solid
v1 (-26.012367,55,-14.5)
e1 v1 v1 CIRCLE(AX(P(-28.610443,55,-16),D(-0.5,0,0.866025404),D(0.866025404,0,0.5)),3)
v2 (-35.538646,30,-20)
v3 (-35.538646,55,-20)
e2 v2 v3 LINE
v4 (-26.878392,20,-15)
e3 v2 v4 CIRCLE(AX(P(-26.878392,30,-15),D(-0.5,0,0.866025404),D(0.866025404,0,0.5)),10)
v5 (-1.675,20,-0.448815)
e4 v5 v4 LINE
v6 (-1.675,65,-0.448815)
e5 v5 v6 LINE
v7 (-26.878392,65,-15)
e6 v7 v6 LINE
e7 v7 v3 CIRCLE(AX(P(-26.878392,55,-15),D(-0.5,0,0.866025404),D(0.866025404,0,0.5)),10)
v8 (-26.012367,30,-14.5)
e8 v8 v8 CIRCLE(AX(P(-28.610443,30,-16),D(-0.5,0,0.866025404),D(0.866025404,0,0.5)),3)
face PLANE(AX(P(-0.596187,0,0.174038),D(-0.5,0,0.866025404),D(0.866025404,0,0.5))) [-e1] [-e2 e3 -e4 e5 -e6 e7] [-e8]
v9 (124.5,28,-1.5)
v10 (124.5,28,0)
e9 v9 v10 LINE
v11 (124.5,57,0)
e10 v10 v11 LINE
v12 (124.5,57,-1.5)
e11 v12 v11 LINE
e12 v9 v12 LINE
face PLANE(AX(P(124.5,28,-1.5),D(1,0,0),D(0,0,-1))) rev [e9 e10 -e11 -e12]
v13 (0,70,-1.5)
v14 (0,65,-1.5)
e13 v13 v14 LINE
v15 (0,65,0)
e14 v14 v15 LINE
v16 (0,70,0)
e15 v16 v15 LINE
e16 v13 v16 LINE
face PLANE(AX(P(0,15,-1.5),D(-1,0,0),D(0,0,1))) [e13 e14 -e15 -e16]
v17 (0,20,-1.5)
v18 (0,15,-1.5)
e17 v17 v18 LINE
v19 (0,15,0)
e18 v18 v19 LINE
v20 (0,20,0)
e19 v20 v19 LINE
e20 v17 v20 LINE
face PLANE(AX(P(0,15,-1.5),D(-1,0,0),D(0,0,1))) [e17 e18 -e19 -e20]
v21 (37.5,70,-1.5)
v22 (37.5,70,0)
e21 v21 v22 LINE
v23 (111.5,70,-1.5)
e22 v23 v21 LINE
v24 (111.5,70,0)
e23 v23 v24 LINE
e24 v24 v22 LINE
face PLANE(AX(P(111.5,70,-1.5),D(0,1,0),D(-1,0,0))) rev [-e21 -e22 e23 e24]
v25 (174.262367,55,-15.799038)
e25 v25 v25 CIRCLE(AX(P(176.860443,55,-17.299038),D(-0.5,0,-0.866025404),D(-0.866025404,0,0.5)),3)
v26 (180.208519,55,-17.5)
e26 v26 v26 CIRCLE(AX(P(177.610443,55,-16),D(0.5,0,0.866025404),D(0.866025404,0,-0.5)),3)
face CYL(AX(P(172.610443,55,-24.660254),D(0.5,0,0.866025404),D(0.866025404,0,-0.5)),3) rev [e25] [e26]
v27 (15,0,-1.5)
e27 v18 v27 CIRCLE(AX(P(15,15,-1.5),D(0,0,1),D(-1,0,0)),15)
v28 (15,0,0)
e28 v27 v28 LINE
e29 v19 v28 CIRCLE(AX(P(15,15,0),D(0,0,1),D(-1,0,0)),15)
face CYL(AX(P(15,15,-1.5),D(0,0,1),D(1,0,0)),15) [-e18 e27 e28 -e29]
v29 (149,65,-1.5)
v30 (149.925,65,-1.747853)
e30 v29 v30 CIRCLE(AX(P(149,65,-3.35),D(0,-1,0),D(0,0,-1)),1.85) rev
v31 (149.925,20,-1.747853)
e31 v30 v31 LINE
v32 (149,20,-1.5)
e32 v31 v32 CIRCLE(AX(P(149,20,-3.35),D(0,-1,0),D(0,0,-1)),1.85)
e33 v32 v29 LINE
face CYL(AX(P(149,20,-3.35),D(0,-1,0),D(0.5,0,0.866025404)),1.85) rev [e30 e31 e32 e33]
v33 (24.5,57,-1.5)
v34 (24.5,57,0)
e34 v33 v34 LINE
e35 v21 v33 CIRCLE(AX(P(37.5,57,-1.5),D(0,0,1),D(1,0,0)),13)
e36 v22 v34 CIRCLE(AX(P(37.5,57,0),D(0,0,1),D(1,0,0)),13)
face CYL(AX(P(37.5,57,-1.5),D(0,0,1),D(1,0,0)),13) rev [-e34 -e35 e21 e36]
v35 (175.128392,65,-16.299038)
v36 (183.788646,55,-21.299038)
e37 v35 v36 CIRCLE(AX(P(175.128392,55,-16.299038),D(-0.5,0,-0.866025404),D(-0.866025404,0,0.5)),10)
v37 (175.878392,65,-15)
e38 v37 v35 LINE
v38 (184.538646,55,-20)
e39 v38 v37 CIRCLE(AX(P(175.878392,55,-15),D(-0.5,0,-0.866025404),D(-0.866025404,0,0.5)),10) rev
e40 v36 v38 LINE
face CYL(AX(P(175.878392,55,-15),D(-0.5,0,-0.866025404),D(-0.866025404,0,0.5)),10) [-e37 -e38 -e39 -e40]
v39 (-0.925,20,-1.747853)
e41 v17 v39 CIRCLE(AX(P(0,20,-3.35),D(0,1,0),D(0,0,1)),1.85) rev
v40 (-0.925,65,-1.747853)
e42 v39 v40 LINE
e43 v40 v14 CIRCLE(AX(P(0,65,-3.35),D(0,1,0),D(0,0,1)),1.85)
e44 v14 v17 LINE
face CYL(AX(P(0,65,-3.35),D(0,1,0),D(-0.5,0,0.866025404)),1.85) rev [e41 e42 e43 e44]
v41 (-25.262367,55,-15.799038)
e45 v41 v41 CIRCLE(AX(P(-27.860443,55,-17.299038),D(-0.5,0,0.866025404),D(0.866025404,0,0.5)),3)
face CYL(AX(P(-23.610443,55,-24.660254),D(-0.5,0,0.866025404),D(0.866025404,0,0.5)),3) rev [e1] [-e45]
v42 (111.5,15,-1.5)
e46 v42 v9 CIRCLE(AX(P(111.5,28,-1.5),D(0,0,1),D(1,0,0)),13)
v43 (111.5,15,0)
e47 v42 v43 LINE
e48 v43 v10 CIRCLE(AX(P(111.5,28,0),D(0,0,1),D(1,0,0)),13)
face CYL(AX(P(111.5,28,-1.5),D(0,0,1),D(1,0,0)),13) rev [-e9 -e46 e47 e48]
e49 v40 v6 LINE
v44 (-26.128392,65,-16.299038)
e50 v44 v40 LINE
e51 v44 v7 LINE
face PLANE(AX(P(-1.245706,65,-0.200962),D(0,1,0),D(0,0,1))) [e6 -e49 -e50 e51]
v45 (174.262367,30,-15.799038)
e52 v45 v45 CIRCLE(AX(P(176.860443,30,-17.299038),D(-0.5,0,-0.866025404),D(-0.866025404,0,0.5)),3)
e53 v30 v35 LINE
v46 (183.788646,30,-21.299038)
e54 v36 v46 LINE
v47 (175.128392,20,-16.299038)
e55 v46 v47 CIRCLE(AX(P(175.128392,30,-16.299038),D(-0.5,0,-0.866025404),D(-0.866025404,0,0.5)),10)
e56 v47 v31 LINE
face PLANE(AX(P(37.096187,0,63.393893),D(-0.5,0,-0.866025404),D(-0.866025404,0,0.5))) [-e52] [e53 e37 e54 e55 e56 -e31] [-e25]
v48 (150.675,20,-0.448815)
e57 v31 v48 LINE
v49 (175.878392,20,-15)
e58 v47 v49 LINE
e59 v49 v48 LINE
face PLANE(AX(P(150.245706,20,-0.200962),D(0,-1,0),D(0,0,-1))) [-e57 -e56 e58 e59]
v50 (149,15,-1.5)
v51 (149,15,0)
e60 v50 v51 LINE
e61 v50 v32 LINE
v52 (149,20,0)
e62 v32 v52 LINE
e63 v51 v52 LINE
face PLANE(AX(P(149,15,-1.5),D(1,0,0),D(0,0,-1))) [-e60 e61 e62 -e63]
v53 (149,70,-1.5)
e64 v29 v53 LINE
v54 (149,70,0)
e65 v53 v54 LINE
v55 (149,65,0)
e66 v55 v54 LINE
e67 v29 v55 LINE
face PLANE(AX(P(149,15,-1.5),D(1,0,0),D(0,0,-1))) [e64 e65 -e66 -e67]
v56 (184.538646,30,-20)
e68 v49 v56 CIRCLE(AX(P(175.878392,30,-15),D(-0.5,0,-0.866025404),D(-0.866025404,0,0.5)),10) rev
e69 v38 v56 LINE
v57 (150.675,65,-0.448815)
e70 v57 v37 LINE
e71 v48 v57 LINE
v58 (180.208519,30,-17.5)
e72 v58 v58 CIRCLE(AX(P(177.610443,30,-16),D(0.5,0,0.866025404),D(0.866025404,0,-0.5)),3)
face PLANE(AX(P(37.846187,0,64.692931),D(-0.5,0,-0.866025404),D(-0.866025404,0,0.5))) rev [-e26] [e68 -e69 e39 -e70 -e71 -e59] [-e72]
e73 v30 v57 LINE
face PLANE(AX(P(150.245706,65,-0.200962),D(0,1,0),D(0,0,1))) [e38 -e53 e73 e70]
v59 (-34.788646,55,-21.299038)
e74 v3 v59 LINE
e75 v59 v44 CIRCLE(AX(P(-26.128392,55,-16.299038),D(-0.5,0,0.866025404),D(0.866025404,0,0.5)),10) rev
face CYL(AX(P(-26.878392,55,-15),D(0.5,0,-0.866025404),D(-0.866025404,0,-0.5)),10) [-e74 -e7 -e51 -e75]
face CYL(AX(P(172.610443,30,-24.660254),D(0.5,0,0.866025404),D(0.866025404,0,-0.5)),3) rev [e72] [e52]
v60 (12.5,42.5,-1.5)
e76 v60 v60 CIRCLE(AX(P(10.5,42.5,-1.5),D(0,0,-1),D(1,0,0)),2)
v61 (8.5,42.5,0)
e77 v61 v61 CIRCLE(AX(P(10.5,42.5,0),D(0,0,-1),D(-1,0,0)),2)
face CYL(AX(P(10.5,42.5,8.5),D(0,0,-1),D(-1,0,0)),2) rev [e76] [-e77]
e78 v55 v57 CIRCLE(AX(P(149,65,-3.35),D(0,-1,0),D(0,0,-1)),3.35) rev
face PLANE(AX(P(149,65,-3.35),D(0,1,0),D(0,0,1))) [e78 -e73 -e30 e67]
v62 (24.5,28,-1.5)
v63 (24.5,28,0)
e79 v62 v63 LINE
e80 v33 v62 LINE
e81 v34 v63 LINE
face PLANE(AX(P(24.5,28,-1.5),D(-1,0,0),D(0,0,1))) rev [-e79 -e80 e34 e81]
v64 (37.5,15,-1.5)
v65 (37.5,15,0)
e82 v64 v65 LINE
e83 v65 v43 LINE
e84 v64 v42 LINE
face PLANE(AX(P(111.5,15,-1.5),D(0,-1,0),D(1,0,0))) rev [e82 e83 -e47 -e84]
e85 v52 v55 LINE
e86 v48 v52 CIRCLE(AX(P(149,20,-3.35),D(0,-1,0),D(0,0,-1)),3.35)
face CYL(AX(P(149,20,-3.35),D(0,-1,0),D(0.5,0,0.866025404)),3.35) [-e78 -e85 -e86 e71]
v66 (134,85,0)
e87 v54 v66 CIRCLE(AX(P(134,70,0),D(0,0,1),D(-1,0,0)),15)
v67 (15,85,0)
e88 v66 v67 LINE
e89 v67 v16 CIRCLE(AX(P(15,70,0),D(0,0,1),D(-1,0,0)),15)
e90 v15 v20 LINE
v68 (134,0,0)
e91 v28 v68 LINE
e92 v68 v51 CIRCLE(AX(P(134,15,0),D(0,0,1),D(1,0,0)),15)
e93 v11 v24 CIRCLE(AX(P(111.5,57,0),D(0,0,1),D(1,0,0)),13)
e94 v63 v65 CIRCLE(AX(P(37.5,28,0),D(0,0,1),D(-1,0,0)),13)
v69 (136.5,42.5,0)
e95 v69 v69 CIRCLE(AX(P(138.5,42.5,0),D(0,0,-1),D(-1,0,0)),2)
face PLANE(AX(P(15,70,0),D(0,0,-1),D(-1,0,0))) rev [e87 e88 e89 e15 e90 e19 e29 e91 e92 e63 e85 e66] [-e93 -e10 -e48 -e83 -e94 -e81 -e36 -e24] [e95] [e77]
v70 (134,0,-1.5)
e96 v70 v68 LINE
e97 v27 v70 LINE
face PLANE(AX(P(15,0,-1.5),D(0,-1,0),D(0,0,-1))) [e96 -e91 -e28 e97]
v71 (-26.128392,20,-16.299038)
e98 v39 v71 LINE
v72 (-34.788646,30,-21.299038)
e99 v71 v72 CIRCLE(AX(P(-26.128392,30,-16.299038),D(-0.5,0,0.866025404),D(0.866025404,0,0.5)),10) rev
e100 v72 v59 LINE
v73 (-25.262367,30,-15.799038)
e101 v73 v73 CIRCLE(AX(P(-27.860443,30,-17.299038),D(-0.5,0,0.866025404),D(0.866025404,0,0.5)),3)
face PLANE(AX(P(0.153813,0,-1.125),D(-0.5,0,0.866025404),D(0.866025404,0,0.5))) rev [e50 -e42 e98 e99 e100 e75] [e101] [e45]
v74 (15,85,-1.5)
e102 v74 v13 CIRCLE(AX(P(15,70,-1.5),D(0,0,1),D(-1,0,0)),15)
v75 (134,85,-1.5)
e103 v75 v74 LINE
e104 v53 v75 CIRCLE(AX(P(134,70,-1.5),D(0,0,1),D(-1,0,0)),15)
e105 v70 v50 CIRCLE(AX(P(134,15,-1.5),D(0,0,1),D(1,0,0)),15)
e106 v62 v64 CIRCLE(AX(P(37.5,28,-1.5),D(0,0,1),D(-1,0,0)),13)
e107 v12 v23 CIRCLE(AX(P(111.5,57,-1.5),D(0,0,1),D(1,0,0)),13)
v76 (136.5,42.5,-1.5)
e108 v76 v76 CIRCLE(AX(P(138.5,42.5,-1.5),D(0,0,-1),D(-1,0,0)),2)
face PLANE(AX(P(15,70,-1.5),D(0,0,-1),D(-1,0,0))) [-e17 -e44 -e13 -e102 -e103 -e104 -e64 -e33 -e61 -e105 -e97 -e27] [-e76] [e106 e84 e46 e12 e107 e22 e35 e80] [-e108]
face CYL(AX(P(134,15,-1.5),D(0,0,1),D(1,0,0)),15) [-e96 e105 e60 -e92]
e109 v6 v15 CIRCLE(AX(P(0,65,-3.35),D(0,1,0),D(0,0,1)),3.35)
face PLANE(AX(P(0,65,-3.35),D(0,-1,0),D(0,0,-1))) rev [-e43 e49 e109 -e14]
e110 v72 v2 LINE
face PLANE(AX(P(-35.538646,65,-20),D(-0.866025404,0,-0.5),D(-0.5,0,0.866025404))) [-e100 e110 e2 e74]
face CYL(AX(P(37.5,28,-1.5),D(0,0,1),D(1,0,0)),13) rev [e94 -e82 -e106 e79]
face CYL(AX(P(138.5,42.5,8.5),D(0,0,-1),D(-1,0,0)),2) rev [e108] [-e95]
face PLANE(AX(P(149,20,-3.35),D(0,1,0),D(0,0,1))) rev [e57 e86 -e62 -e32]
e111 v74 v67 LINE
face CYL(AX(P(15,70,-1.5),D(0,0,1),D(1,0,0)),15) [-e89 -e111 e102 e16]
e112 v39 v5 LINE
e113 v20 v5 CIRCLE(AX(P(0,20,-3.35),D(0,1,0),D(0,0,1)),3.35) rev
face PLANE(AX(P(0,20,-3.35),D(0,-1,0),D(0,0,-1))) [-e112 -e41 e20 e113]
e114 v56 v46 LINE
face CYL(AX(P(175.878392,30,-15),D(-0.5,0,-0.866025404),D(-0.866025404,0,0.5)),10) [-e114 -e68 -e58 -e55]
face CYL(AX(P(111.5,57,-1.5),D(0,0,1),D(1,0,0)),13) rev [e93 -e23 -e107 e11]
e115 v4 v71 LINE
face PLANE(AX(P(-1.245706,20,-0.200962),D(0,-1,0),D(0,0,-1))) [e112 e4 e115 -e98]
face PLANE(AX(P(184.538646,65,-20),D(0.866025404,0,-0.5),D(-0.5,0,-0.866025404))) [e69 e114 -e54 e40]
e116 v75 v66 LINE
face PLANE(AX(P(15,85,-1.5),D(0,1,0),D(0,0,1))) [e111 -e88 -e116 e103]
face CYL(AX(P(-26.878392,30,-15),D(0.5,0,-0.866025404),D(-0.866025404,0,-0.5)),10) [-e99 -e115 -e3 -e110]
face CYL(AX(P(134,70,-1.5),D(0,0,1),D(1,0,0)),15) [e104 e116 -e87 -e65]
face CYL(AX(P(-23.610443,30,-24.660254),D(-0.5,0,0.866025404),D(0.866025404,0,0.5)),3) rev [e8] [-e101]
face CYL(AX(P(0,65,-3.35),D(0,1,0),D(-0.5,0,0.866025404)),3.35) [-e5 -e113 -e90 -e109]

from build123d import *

# Parameters (mm, degrees)
BASE_FLANGE1_DEPTH          = 1.5
SM_EDGE_FLANGE_1_DEPTH      = 45
SM_EDGE_FLANGE_1_BEND_DEPTH = 45
SKETCH12_R                  = 3
CUT_EXTRUDE1_DEPTH          = 10
FILLET1_R                   = 10
SKETCH13_R                  = 3
CUT_EXTRUDE2_DEPTH          = 10
SKETCH14_R                  = 2
CUT_EXTRUDE3_DEPTH          = 10


# Sheet-metal steps are written as plain solids
with BuildPart() as part:
    # Sketch1 → Base-Flange1 (new body)
    with BuildSketch(Plane.XY):
        with BuildLine():
            Line((15, 0), (134, 0))
            ThreePointArc((134, 0), (144.606601718, 4.393398282), (149, 15))
            Line((149, 15), (149, 70))
            ThreePointArc((149, 70), (144.606601718, 80.606601718), (134, 85))
            Line((134, 85), (15, 85))
            ThreePointArc((15, 85), (4.393398282, 80.606601718), (0, 70))
            Line((0, 70), (0, 15))
            ThreePointArc((0, 15), (4.393398282, 4.393398282), (15, 0))
        make_face()
        with BuildLine():
            Line((111.5, 15), (37.5, 15))
            ThreePointArc((37.5, 15), (28.307611845, 18.807611845), (24.5, 28))
            Line((24.5, 28), (24.5, 57))
            ThreePointArc((24.5, 57), (28.307611845, 66.192388155), (37.5, 70))
            Line((37.5, 70), (111.5, 70))
            ThreePointArc((111.5, 70), (120.692388155, 66.192388155), (124.5, 57))
            Line((124.5, 57), (124.5, 28))
            ThreePointArc((124.5, 28), (120.692388155, 18.807611845), (111.5, 15))
        make_face(mode=Mode.SUBTRACT)
    extrude(amount=-BASE_FLANGE1_DEPTH)

    # Ребро-кромка1 section (across the edge) → Ребро-кромка1 (add)
    with BuildSketch(Plane(origin=(-0.495706006, 20, -1.5), x_dir=(0.49999999999999495, 0, -0.8660254037844416), z_dir=(0, 1, 0))):
        with BuildLine():
            Line((-1.5, 0.495706006), (-1.5, 39.598076211))
            Line((-1.5, 39.598076211), (0, 39.598076211))
            Line((0, 39.598076211), (0, 0.495706006))
            ThreePointArc((0, 0.495706006), (0.063037221, 0.016890773), (0.247853003, -0.429293994))
            Line((0.247853003, -0.429293994), (-1.051185103, -1.179293994))
            ThreePointArc((-1.051185103, -1.179293994), (-1.385851518, -0.371337795), (-1.5, 0.495706006))
        make_face()
    extrude(amount=SM_EDGE_FLANGE_1_DEPTH)

    # Ребро-кромка1 section 2 (across the edge) → Ребро-кромка1 bend (add)
    with BuildSketch(Plane(origin=(149.495706006, 65, -1.5), x_dir=(-0.49999999999999495, 0, -0.8660254037844416), z_dir=(0, -1, 0))):
        with BuildLine():
            Line((-1.5, 0.495706006), (-1.5, 39.598076211))
            Line((-1.5, 39.598076211), (0, 39.598076211))
            Line((0, 39.598076211), (0, 0.495706006))
            ThreePointArc((0, 0.495706006), (0.063037221, 0.016890773), (0.247853003, -0.429293994))
            Line((0.247853003, -0.429293994), (-1.051185103, -1.179293994))
            ThreePointArc((-1.051185103, -1.179293994), (-1.385851518, -0.371337795), (-1.5, 0.495706006))
        make_face()
    extrude(amount=SM_EDGE_FLANGE_1_BEND_DEPTH)

    # Sketch12 → Cut-Extrude1 (cut)
    with BuildSketch(Plane(origin=(37.474407449, 0, 64.907577685), x_dir=(0.8660254037844416, 0, -0.49999999999999517), z_dir=(0.49999999999999517, 0, 0.8660254037844416))):
        with Locations((161.815155369, 30)):
            Circle(SKETCH12_R)
        with Locations((161.815155369, 55)):
            Circle(SKETCH12_R)
    extrude(amount=-CUT_EXTRUDE1_DEPTH, mode=Mode.SUBTRACT)

    # Fillet1
    fillet1_edges = [part.edges().sort_by_distance(p)[0] for p in [
        (-35.163645946, 20, -20.649519053),
        (-35.163645946, 65, -20.649519053),
        (184.163645946, 65, -20.649519053),
        (184.163645946, 20, -20.649519053),
    ]]
    fillet(fillet1_edges, radius=FILLET1_R)

    # Sketch13 → Cut-Extrude2 (cut)
    with BuildSketch(Plane(origin=(-0.224407449, 0, 0.388685103), x_dir=(0.8660254037844416, 0, 0.49999999999999517), z_dir=(-0.49999999999999517, 0, 0.8660254037844416))):
        with Locations((-32.777370205, 30)):
            Circle(SKETCH13_R)
        with Locations((-32.777370205, 55)):
            Circle(SKETCH13_R)
    extrude(amount=-CUT_EXTRUDE2_DEPTH, mode=Mode.SUBTRACT)

    # Sketch14 → Cut-Extrude3 (cut)
    with BuildSketch(Plane(origin=(0, 0, -1.5), x_dir=(-1, 0, 0), z_dir=(0, 0, -1))):
        with Locations((-138.5, 42.5)):
            Circle(SKETCH14_R)
        with Locations((-10.5, 42.5)):
            Circle(SKETCH14_R)
    extrude(amount=-CUT_EXTRUDE3_DEPTH, mode=Mode.SUBTRACT)


solid = part.part
